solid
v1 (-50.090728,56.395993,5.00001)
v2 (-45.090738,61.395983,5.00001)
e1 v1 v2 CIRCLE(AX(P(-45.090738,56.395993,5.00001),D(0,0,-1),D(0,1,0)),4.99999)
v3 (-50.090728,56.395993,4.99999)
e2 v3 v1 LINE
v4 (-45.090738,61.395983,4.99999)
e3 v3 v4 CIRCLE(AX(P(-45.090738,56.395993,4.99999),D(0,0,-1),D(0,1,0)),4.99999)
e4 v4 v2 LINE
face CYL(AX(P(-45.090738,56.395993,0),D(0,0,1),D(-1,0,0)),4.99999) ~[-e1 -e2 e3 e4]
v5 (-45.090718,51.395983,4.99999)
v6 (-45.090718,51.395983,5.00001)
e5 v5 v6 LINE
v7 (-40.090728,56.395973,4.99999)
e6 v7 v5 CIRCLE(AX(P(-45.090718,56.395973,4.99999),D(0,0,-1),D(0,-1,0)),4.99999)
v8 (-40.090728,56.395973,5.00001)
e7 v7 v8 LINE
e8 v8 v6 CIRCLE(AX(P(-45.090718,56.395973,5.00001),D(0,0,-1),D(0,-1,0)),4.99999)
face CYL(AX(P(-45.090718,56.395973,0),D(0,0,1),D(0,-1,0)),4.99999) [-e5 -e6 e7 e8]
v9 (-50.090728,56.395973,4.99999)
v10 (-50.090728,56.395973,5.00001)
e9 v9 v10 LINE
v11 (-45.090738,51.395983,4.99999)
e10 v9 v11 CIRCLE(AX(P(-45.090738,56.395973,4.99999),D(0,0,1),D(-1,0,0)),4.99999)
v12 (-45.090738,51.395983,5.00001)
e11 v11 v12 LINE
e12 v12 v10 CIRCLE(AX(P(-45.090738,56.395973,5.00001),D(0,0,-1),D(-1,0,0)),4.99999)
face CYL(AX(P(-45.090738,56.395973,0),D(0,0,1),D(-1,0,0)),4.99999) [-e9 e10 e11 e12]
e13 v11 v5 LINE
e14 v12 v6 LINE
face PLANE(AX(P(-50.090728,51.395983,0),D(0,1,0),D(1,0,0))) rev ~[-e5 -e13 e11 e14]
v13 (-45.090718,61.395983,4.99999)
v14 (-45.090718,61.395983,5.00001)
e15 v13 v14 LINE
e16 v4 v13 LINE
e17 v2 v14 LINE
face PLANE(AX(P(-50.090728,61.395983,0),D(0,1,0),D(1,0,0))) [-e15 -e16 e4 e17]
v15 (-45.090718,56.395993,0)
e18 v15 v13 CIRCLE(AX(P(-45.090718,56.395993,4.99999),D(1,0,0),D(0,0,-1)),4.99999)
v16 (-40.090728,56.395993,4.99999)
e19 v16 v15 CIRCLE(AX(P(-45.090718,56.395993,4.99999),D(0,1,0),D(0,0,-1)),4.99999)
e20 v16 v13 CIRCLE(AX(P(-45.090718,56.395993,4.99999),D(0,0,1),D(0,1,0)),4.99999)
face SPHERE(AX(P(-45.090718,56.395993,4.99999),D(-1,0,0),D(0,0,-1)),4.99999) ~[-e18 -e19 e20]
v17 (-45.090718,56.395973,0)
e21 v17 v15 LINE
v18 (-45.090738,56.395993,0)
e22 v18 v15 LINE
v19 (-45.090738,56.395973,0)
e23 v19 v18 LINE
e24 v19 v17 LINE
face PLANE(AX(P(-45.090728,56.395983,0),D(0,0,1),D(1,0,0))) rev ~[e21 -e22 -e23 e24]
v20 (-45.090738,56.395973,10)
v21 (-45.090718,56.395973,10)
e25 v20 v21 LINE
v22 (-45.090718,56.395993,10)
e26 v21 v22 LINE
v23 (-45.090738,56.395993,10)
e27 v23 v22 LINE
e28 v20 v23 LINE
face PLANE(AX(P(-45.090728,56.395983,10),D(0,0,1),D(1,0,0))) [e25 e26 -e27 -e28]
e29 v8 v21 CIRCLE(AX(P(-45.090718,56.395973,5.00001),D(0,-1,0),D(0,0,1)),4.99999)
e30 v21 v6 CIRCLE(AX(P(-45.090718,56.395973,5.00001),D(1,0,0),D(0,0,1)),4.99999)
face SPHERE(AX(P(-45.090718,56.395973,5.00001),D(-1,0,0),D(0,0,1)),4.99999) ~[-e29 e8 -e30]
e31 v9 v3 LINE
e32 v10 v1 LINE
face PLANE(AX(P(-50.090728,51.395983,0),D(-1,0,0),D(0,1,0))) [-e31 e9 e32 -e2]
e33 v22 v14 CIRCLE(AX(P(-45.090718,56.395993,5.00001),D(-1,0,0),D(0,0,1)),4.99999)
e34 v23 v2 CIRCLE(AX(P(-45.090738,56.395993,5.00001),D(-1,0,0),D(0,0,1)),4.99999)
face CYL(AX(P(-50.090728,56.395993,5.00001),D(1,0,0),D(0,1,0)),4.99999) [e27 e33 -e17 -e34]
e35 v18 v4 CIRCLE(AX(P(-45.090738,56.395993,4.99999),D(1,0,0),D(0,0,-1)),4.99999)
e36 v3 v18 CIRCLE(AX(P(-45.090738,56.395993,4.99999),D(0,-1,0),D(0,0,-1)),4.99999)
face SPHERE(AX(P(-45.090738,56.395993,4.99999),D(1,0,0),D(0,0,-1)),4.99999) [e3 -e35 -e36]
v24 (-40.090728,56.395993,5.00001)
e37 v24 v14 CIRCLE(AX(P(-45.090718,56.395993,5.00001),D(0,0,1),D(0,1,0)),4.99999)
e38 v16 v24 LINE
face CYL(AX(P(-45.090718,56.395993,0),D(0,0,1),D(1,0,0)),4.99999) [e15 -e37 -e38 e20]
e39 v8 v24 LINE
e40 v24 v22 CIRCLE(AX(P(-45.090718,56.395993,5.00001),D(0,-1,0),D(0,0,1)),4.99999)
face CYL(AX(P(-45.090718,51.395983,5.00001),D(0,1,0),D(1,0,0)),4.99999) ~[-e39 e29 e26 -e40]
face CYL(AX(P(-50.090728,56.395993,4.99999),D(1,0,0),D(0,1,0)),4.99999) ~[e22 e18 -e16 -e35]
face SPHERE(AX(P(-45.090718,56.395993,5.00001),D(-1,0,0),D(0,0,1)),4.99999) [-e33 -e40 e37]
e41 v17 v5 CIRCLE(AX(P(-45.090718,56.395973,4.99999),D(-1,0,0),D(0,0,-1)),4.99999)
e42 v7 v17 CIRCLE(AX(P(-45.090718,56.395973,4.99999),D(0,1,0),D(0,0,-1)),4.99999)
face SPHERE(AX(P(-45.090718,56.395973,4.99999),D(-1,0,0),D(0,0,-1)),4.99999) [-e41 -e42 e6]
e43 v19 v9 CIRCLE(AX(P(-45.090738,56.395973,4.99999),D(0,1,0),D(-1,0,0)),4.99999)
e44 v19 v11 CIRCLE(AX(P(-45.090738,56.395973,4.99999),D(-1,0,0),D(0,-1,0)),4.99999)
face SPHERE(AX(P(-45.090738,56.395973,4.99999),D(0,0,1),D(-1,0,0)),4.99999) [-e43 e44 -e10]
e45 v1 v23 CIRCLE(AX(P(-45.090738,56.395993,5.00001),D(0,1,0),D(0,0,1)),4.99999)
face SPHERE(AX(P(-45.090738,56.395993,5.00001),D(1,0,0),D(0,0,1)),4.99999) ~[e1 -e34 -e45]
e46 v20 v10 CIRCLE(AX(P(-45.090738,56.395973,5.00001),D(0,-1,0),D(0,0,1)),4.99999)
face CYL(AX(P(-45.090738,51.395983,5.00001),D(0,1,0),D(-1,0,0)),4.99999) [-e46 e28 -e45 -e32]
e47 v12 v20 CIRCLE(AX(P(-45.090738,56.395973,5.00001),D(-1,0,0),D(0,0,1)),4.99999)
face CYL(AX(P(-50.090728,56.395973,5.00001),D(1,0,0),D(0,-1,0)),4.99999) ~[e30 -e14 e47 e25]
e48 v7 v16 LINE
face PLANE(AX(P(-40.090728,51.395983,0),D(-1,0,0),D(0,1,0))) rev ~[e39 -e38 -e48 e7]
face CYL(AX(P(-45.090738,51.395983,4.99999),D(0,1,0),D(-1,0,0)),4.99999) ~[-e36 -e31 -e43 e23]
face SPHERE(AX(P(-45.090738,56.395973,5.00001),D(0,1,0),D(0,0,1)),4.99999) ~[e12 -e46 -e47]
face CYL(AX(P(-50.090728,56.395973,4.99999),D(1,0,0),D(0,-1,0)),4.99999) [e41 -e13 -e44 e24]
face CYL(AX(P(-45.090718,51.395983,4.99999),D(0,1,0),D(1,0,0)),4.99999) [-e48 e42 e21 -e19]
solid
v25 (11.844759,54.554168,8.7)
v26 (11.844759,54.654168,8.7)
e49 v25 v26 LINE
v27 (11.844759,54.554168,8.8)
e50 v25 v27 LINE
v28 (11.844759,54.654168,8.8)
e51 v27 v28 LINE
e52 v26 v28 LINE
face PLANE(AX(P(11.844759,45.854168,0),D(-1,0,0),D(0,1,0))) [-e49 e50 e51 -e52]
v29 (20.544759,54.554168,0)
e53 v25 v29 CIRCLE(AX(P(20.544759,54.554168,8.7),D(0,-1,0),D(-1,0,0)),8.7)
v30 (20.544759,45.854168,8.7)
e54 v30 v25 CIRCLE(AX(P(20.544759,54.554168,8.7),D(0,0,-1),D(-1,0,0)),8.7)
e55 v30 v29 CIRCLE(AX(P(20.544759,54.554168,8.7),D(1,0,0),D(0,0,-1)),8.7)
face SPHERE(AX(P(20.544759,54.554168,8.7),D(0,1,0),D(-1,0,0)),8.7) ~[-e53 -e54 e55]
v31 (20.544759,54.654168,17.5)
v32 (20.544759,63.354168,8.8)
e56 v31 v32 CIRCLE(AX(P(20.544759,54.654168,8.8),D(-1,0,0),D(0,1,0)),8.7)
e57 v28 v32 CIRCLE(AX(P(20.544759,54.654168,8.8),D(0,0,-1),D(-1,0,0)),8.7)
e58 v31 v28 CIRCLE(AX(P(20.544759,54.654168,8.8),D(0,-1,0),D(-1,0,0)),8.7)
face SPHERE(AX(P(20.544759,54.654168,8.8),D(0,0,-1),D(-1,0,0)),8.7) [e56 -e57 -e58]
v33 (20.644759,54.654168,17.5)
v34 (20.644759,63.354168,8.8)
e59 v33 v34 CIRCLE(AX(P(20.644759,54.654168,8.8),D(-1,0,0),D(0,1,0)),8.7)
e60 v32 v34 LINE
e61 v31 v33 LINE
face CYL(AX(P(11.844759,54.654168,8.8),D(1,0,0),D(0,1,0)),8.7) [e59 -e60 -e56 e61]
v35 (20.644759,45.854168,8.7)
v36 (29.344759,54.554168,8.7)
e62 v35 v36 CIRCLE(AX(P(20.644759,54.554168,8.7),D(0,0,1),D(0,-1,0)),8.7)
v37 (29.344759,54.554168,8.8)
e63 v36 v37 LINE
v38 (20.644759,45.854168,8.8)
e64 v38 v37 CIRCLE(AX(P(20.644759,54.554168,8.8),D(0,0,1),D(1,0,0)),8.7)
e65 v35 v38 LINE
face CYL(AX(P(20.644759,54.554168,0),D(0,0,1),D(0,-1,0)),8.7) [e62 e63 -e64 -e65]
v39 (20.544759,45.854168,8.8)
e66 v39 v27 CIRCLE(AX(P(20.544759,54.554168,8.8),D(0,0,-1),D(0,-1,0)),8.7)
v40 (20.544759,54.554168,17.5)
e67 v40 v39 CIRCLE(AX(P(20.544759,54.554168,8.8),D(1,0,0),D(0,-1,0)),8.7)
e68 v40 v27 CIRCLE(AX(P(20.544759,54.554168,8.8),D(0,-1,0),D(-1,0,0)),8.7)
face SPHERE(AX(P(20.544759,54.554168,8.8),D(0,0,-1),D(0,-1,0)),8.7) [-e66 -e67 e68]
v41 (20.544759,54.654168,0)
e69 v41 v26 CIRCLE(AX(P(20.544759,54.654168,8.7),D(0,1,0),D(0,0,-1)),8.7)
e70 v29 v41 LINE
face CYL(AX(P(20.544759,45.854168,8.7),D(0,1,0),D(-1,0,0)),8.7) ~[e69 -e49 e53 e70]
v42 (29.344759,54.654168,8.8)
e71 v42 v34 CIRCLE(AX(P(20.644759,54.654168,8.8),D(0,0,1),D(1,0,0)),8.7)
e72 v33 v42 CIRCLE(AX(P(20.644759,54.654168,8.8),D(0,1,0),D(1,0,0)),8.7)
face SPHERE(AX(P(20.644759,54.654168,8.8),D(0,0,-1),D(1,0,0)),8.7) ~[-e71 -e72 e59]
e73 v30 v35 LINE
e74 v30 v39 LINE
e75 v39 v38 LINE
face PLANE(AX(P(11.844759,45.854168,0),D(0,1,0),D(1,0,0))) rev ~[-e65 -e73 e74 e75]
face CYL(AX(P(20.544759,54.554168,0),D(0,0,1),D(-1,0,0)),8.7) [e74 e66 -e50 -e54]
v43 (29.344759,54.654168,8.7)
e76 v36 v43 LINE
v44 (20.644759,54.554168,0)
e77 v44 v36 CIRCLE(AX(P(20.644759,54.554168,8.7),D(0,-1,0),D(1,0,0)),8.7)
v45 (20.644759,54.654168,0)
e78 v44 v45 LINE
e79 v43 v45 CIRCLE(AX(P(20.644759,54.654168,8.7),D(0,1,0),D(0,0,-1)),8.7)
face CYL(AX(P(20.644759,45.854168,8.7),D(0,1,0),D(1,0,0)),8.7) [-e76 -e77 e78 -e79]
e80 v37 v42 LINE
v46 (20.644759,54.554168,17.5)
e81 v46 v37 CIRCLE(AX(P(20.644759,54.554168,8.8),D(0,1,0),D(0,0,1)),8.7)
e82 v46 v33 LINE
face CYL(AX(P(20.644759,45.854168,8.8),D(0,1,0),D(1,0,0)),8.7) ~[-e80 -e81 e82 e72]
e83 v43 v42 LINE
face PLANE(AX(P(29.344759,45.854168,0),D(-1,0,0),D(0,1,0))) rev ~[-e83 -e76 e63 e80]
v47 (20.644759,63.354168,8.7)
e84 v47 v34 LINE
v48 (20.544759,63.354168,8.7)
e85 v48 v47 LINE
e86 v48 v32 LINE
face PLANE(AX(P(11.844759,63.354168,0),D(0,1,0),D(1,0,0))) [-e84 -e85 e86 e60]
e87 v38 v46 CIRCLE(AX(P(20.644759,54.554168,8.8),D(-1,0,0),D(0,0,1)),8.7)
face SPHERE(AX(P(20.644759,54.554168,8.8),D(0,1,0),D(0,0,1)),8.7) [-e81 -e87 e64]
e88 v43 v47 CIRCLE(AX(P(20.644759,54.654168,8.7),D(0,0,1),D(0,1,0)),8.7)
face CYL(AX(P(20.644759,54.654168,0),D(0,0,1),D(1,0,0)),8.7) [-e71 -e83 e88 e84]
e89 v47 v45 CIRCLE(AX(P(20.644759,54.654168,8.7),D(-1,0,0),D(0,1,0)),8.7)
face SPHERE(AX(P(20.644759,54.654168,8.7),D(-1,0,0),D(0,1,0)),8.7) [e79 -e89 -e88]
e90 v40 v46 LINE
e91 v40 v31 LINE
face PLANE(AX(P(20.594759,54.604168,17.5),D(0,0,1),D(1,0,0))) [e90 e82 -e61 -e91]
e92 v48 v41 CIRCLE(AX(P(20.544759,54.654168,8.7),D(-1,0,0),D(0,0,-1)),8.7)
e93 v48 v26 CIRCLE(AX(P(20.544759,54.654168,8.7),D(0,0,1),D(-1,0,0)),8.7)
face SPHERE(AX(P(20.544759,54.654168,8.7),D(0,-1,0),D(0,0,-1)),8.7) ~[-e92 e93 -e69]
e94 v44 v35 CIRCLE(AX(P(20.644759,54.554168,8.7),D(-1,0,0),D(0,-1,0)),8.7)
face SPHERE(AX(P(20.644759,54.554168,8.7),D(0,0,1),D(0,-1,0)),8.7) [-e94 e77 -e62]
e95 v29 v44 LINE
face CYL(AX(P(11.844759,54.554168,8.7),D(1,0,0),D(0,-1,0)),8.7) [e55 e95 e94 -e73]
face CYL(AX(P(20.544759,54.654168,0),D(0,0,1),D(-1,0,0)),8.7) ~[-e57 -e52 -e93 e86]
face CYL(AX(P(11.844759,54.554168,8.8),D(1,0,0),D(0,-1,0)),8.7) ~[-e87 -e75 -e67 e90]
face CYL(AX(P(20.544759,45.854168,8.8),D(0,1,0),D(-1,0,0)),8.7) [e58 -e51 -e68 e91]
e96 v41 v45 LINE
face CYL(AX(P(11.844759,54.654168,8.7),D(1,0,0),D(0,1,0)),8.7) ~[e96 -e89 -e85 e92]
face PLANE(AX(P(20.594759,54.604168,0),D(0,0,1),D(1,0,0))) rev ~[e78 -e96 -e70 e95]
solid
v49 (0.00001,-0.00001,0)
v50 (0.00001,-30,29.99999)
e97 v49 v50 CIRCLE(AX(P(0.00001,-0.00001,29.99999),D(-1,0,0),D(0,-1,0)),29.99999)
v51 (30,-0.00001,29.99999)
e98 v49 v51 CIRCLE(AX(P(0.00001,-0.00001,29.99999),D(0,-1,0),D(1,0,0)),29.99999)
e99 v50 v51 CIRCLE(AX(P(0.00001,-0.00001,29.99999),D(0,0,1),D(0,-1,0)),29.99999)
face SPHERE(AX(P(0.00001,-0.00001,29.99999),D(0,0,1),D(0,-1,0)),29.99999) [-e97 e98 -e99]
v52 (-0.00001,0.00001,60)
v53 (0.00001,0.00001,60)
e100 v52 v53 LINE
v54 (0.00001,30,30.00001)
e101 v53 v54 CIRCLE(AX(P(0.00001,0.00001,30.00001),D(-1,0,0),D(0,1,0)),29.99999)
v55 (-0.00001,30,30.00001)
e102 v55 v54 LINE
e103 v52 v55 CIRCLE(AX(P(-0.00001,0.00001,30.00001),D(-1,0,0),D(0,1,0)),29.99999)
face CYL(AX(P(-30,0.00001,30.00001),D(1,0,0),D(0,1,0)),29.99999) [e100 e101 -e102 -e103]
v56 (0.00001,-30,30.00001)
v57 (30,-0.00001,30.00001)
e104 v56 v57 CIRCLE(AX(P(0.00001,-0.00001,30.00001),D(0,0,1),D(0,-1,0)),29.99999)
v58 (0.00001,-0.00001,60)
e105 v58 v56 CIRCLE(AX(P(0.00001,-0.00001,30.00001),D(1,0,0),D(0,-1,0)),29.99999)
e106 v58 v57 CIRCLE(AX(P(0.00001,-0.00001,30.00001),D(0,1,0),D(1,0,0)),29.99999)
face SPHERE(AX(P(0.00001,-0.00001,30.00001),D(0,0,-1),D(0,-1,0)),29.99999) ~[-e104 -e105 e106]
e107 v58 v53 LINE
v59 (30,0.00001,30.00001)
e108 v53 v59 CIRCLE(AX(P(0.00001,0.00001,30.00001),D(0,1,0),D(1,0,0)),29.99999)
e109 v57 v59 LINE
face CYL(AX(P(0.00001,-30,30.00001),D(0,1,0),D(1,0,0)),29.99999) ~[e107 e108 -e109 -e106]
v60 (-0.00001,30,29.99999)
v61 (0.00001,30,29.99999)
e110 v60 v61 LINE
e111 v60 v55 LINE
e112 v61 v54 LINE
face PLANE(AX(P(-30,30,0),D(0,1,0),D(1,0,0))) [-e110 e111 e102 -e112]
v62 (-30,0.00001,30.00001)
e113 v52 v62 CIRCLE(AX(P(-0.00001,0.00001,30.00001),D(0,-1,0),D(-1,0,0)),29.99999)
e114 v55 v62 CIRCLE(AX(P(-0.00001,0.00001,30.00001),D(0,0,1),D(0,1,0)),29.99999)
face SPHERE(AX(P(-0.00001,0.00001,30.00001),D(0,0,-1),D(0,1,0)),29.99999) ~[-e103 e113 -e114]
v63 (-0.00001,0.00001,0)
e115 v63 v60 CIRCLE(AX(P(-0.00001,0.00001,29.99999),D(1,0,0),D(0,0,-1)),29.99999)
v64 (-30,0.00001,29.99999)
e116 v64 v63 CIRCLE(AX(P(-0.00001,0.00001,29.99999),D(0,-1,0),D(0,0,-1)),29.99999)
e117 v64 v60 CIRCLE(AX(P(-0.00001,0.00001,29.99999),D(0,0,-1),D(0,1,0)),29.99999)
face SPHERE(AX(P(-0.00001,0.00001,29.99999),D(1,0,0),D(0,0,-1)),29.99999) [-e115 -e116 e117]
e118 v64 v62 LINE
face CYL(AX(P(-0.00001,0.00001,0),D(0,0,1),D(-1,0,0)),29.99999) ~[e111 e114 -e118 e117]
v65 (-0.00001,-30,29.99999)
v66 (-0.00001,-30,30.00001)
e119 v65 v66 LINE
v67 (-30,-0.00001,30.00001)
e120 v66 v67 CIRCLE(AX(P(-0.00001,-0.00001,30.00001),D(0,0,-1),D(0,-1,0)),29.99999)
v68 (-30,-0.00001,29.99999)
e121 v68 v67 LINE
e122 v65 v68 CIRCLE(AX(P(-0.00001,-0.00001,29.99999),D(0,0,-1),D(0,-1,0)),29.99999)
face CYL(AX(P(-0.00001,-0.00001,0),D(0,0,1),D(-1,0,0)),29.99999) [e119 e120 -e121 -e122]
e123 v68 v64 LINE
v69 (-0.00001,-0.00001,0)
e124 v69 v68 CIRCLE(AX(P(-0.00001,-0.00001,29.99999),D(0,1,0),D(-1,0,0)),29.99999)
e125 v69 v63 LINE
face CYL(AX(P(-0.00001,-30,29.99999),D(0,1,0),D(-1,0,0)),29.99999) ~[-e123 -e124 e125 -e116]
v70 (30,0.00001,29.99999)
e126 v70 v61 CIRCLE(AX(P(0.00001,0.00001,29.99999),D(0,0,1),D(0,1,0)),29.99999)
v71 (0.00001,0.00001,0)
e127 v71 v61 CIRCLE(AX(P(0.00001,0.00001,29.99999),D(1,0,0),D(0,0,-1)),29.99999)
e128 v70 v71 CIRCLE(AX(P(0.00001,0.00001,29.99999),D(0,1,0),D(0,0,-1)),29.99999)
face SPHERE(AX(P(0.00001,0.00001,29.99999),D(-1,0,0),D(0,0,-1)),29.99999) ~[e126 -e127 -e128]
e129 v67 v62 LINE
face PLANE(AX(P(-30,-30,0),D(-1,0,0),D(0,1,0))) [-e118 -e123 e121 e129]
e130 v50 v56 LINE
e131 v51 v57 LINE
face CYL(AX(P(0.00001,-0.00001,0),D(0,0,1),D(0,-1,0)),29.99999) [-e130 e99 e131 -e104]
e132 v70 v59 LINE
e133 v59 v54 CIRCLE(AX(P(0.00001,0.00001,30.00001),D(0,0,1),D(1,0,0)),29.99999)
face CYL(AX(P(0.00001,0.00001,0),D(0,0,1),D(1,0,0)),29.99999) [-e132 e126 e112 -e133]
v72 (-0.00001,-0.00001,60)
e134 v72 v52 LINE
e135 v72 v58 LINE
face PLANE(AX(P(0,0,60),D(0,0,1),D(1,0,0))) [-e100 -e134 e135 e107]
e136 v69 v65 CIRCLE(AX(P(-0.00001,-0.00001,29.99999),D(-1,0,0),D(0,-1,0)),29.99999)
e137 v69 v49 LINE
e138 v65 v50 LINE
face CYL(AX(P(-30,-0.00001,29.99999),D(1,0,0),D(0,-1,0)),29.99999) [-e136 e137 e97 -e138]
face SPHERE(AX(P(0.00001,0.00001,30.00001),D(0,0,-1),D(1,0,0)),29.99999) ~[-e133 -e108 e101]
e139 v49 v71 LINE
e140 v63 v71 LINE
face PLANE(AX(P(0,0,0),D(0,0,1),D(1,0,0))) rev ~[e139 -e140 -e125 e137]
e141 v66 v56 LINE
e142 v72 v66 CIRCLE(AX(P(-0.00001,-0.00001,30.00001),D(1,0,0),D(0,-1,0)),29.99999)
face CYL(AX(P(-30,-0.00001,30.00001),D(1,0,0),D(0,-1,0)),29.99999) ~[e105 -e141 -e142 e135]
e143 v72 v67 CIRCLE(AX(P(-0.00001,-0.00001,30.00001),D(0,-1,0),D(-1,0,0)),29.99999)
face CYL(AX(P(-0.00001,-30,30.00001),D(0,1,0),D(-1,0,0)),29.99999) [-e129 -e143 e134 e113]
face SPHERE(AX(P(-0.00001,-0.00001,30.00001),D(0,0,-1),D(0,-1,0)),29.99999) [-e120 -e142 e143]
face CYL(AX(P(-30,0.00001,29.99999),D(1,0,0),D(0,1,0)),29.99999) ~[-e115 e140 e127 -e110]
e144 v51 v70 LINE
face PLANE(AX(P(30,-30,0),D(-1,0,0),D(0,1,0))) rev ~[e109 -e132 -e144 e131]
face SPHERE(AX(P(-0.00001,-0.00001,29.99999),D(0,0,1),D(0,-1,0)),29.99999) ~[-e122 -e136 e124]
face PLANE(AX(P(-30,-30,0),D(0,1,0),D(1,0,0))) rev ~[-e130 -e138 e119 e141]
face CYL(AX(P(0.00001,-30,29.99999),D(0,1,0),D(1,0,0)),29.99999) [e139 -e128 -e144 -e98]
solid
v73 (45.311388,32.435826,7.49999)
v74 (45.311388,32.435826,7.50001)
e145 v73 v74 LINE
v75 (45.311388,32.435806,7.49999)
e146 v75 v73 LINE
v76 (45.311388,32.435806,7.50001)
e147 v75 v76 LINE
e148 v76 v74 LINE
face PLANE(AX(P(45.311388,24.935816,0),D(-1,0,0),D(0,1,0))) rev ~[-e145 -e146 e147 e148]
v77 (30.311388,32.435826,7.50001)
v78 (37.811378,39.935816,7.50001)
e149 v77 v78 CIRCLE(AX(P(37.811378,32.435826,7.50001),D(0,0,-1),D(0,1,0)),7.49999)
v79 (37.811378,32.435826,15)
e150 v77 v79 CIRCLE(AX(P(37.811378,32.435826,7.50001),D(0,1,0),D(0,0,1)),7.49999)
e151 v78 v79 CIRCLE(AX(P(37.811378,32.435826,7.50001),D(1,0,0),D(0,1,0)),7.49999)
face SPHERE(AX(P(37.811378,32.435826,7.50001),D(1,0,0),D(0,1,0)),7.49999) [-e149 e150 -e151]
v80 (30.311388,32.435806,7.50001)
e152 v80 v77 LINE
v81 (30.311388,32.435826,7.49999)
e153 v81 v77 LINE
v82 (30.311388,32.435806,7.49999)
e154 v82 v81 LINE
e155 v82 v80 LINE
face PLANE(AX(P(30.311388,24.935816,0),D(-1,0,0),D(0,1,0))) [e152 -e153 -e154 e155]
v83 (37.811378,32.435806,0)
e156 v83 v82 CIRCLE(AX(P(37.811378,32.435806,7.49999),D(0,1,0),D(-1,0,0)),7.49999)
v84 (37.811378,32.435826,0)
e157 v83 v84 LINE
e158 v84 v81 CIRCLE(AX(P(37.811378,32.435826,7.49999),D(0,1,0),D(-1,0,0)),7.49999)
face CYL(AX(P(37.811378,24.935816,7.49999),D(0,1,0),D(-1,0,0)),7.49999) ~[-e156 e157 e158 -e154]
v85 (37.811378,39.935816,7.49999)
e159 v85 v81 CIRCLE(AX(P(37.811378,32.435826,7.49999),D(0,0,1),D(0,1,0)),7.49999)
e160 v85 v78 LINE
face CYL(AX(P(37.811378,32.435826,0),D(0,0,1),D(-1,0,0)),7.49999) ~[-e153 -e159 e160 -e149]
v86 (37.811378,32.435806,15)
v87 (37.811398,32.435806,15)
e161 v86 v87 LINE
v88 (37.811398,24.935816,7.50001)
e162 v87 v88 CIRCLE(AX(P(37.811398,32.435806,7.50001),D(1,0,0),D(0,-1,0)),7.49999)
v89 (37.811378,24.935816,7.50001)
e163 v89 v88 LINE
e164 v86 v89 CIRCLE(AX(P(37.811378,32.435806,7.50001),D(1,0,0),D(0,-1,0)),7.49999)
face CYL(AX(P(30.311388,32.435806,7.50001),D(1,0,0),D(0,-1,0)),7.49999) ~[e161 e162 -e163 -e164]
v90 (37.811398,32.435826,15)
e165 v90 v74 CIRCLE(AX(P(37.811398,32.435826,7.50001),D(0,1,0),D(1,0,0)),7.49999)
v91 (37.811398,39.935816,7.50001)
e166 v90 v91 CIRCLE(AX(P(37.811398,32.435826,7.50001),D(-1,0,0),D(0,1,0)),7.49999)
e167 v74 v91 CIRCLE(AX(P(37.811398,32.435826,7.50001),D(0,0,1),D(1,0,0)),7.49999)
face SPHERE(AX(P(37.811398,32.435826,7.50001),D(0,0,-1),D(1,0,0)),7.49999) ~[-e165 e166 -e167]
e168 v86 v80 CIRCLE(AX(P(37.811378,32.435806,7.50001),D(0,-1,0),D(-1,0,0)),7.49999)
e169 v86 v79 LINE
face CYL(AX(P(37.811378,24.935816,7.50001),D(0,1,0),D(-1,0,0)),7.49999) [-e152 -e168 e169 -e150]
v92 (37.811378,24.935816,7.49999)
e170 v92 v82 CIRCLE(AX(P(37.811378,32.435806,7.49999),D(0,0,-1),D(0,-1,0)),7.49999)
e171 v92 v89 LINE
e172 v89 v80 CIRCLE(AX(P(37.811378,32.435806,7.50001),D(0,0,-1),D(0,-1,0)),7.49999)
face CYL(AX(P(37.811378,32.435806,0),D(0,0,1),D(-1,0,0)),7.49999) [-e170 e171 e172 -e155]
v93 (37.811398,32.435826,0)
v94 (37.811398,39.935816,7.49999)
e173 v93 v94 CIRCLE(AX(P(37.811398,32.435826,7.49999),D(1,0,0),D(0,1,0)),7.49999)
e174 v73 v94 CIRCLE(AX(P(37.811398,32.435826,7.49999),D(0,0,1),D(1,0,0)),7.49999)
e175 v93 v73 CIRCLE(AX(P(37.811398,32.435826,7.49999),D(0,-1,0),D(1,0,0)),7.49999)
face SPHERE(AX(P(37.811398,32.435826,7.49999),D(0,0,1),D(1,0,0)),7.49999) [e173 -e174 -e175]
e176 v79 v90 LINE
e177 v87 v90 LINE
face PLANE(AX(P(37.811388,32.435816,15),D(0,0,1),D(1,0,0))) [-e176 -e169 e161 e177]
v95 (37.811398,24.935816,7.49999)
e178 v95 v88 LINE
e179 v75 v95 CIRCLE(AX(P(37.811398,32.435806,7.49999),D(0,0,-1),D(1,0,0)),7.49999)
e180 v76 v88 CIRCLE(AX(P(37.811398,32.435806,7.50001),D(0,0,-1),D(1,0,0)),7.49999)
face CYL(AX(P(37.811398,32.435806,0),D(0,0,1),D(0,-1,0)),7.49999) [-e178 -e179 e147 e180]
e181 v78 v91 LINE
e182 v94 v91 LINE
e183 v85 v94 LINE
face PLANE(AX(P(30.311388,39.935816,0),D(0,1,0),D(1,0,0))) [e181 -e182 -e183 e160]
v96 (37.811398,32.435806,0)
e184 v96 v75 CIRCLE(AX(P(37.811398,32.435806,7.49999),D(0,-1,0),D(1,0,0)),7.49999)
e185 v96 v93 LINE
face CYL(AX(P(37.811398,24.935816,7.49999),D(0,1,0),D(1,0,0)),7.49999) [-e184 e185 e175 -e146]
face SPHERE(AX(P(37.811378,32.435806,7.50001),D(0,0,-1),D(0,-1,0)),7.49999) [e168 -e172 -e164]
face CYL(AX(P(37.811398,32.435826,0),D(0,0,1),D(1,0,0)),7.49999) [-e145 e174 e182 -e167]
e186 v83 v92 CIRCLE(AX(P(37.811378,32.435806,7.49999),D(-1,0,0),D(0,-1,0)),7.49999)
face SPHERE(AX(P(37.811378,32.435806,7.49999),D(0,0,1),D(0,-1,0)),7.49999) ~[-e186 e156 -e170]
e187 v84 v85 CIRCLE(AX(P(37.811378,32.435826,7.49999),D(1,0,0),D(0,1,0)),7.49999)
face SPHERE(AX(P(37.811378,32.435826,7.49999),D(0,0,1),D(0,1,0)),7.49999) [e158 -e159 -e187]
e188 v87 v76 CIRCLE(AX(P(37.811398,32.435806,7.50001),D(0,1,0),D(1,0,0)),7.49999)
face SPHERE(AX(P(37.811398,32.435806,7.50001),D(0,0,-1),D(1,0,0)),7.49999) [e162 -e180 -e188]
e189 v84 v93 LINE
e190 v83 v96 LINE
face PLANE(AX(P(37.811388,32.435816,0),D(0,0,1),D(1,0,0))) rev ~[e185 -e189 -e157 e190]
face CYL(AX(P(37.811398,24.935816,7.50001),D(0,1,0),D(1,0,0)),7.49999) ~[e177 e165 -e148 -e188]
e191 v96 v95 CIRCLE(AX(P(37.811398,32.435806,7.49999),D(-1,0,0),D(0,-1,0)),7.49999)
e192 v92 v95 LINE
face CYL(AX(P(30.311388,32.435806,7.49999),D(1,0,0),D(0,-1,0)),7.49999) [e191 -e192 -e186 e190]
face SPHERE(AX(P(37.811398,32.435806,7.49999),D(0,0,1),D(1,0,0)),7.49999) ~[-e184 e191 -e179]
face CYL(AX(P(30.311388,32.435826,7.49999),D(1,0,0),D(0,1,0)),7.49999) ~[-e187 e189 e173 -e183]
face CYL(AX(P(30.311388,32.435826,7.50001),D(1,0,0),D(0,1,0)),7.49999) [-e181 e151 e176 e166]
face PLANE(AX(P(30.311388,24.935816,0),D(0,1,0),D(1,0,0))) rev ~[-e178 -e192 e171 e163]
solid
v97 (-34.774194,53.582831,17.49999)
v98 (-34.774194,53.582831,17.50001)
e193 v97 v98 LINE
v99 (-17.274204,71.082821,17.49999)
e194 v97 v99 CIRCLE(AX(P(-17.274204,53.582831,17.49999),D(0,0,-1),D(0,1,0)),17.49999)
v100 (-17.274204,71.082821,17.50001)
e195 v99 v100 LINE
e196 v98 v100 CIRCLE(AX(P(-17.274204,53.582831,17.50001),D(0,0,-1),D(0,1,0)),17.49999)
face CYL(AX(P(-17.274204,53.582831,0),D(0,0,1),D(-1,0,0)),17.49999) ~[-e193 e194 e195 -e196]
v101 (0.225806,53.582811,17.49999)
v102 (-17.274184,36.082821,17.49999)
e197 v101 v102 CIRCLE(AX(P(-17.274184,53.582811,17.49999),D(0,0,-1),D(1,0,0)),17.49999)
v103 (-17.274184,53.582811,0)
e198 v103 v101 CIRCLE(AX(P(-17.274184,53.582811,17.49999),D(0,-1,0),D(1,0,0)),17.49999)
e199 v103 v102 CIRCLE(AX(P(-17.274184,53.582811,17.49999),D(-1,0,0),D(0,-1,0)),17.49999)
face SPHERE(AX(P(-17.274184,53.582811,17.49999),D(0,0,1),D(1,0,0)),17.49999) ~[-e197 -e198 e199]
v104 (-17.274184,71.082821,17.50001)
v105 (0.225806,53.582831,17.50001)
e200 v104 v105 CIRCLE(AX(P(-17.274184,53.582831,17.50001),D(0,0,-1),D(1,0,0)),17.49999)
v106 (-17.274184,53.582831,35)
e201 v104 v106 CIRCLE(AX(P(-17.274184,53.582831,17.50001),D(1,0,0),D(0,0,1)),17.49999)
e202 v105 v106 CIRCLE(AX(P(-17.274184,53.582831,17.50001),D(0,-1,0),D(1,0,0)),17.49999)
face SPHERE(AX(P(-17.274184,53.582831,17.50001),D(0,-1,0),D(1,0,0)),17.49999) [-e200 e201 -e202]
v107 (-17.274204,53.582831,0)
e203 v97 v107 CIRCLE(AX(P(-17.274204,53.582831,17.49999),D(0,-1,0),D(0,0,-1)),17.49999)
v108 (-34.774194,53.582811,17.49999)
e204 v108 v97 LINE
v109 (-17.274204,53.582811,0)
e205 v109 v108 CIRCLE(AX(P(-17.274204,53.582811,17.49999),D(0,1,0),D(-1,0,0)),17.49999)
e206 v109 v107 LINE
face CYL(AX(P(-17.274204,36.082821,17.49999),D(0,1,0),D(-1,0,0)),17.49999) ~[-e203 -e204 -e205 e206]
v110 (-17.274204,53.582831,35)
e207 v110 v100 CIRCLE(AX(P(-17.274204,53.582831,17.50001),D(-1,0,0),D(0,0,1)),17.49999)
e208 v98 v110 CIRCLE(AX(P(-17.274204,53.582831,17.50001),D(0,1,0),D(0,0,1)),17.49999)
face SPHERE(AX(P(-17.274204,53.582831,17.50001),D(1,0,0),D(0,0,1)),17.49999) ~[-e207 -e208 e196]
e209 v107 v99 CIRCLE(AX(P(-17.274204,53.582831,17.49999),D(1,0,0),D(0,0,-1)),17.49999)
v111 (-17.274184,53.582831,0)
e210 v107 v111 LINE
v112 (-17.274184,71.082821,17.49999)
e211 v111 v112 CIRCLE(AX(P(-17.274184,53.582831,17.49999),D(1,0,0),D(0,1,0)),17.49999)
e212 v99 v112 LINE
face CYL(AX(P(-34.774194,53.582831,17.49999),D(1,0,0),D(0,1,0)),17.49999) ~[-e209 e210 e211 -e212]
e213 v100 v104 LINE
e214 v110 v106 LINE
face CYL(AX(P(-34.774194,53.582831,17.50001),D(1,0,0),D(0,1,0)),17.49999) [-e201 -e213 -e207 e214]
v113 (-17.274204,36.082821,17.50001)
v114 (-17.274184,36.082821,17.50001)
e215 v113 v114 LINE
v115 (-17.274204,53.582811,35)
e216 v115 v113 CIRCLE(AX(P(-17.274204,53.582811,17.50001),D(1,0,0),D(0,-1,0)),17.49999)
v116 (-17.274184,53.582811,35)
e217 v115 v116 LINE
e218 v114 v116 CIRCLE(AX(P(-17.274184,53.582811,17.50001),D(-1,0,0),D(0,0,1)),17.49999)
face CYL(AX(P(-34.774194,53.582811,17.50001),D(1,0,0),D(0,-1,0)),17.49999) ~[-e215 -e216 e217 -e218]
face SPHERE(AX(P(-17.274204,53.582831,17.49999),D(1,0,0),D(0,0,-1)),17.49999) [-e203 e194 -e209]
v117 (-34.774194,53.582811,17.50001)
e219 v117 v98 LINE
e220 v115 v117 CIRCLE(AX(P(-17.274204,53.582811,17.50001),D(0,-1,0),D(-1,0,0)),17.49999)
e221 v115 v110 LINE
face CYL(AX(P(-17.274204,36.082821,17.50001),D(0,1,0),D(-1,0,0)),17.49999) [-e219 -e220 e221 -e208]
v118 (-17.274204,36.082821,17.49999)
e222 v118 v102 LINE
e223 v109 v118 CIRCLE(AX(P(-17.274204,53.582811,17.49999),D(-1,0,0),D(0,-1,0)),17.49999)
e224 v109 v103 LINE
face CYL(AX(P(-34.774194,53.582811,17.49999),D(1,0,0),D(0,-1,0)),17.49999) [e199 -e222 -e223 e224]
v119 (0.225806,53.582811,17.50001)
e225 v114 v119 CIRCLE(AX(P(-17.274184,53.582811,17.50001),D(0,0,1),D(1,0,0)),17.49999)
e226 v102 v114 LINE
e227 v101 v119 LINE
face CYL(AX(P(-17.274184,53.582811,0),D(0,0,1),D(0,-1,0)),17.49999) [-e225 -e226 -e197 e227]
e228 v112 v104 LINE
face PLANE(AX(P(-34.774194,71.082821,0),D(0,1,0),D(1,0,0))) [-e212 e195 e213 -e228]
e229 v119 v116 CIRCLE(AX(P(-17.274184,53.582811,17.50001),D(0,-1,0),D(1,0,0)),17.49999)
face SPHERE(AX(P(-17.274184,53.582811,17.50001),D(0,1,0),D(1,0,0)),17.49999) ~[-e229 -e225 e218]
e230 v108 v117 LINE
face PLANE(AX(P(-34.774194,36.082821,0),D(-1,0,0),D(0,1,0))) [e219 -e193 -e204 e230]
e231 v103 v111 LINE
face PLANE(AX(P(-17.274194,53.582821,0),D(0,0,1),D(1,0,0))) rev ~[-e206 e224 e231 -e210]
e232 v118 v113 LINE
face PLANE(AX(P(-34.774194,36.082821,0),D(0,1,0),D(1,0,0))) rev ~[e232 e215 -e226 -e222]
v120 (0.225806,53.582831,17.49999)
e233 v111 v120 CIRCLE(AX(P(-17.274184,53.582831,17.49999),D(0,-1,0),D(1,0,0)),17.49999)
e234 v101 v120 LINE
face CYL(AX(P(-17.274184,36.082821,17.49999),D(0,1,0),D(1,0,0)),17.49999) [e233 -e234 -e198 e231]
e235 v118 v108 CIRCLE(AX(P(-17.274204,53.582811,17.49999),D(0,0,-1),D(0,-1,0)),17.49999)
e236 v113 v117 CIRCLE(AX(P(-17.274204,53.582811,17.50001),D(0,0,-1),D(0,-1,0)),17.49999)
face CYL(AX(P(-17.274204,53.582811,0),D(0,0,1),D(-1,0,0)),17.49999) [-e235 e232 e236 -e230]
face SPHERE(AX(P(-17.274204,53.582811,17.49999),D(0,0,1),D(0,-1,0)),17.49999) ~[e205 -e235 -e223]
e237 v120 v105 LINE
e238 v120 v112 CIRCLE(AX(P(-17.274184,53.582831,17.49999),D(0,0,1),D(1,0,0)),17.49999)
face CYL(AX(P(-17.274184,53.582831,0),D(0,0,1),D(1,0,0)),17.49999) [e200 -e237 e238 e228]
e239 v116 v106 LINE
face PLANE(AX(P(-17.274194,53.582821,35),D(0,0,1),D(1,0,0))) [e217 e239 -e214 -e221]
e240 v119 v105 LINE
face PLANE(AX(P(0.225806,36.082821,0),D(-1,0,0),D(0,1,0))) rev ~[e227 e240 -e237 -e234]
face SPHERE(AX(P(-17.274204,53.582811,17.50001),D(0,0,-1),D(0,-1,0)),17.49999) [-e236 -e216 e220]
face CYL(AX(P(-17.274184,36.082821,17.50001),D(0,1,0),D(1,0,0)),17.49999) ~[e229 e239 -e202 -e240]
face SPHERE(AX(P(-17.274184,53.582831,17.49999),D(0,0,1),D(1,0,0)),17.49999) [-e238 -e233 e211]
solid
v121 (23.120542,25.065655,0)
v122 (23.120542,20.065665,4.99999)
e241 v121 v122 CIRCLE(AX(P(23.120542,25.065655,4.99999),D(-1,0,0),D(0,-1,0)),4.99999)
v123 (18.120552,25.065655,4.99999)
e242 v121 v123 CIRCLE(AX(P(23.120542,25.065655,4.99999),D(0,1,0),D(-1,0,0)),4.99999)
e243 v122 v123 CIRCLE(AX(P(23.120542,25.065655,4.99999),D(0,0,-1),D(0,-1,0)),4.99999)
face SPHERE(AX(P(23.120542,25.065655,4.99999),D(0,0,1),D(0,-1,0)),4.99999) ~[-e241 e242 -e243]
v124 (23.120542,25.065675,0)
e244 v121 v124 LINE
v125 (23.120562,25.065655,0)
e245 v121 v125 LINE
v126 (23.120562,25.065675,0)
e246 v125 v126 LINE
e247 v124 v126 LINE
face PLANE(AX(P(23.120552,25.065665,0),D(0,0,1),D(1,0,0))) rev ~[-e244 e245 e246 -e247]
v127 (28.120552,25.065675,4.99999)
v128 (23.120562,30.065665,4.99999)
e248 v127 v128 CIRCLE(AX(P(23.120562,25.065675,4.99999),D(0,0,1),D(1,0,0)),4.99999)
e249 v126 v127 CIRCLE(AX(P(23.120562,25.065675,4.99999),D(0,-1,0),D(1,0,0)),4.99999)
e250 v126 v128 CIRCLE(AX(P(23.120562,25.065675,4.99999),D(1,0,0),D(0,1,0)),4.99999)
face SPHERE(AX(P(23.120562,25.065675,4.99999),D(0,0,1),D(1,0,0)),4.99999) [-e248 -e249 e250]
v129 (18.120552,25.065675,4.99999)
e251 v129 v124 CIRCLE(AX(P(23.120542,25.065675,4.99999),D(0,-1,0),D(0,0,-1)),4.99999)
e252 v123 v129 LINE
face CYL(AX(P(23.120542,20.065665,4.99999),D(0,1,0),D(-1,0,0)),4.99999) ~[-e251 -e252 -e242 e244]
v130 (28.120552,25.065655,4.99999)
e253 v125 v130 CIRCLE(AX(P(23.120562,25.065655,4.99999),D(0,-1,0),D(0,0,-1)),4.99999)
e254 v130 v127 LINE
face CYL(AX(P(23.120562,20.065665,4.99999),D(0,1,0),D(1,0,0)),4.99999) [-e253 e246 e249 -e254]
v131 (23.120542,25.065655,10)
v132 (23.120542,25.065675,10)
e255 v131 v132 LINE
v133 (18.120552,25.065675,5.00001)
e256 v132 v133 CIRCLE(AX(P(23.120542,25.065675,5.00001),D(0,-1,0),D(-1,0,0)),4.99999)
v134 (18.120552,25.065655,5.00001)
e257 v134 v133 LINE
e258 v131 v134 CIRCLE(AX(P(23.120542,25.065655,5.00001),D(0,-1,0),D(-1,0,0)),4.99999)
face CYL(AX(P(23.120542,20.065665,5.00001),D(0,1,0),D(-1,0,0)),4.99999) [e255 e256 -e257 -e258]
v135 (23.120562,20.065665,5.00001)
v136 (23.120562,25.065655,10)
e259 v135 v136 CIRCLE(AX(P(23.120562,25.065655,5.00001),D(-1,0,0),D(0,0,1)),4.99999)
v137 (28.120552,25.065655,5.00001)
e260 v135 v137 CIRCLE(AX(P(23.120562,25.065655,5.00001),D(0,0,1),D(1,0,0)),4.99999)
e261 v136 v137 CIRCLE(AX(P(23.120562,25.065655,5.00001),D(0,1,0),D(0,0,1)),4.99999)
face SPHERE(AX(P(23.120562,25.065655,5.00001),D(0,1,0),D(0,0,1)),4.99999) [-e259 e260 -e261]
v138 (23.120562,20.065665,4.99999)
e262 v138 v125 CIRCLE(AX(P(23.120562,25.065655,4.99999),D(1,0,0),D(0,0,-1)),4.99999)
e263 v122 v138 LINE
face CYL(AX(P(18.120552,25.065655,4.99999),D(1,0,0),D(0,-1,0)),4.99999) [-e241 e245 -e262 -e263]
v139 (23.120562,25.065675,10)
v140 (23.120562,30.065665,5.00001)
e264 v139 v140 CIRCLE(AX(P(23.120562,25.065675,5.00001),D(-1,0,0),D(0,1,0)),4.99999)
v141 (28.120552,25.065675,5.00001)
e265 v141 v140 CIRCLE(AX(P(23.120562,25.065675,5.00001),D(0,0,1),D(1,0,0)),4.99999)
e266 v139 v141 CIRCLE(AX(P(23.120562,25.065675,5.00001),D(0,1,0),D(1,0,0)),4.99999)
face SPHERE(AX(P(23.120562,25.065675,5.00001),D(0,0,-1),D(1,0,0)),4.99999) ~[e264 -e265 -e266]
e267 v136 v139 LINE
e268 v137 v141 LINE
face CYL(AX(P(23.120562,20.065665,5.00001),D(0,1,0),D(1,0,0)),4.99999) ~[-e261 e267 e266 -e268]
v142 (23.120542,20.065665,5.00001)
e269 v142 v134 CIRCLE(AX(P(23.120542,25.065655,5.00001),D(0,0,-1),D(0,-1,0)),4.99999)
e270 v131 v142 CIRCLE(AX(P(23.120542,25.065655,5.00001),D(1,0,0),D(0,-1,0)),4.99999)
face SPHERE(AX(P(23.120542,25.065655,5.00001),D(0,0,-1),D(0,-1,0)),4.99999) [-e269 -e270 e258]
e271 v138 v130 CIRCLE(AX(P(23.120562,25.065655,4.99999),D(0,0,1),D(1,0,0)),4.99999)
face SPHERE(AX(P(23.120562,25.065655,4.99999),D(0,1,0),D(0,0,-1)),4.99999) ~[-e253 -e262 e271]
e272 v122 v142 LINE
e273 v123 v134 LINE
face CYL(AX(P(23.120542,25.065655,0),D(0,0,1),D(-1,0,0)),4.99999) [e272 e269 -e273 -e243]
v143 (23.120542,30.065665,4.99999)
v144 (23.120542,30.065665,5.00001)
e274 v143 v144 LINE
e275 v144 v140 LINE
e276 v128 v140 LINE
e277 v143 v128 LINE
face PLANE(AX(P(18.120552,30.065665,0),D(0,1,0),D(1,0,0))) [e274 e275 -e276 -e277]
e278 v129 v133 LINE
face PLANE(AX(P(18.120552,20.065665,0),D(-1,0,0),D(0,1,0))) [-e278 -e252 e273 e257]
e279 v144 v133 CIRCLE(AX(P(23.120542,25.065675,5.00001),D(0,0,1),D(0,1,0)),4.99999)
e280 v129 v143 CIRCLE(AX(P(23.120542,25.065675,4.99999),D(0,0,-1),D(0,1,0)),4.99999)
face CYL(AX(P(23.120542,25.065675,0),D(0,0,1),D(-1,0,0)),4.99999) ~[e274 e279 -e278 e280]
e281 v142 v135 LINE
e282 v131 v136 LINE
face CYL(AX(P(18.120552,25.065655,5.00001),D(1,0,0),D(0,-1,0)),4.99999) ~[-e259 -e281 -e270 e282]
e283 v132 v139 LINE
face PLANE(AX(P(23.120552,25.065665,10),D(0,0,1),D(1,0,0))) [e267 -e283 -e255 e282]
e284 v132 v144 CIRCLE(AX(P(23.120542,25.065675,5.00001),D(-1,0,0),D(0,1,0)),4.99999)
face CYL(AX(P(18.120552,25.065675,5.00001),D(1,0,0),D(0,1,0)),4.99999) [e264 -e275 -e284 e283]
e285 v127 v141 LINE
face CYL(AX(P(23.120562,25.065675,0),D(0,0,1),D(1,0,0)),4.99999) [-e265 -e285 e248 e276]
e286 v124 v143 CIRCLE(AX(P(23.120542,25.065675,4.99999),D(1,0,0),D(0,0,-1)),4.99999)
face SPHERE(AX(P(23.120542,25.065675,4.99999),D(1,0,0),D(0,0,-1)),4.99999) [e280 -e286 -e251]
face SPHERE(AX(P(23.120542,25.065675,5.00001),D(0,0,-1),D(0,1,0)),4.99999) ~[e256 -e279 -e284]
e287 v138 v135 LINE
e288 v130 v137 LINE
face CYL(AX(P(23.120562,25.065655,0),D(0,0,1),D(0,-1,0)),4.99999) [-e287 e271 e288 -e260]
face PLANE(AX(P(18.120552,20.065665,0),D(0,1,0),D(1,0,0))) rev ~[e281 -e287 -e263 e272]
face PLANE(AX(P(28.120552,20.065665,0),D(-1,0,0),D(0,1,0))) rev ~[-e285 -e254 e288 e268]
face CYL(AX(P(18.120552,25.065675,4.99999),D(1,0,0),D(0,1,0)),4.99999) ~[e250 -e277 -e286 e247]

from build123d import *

# Parameters (mm, degrees)
F0_W      = 60
F0_H      = 60
F1_DEPTH  = 60
F2_R      = 29.99999
F3_W      = 10
F3_H      = 10
F4_DEPTH  = 10
F5_R      = 4.99999
F6_W      = 15
F6_H      = 15
F7_DEPTH  = 15
F8_R      = 7.49999
F9_W      = 17.5
F9_H      = 17.5
F10_DEPTH = 17.5
F11_R     = 8.7
F12_W     = 35
F12_H     = 35
F13_DEPTH = 35
F14_R     = 17.49999
F15_W     = 10
F15_H     = 10
F16_DEPTH = 10
F17_R     = 4.99999


# Not quite as in the source:
# - a fillet or chamfer is up to 0.001 mm smaller than in the source, because OpenCascade refuses the exact size


with BuildPart() as f1:
    # F0 (on Top) → F1 (new body)
    with BuildSketch(Plane.XY):
        Rectangle(F0_W, F0_H)
    extrude(amount=F1_DEPTH)

    # F2 (radius 30 in the source; OpenCascade refuses exactly that, so slightly less here)
    f2_edges = [f1.edges().sort_by_distance(p)[0] for p in [
        (30, -30, 30),
        (-30, -30, 30),
        (0, -30, 0),
        (0, -30, 60),
        (0, 30, 0),
        (-30, 0, 0),
        (30, 0, 0),
        (30, 30, 30),
        (30, 0, 60),
        (-30, 30, 30),
        (0, 30, 60),
        (-30, 0, 60),
    ]]
    fillet(f2_edges, radius=F2_R)


with BuildPart() as f4:
    # F3 (on Top) → F4 (new body)
    with BuildSketch(Plane.XY):
        with Locations((23.1205523014, 25.0656651421)):
            Rectangle(F3_W, F3_H)
    extrude(amount=F4_DEPTH)

    # F5 (radius 5 in the source; OpenCascade refuses exactly that, so slightly less here)
    f5_edges = [f4.edges().sort_by_distance(p)[0] for p in [
        (28.120552, 30.065665, 5),
        (18.120552, 20.065665, 5),
        (28.120552, 25.065665, 0),
        (28.120552, 25.065665, 10),
        (23.120552, 20.065665, 10),
        (23.120552, 20.065665, 0),
        (28.120552, 20.065665, 5),
        (23.120552, 30.065665, 0),
        (18.120552, 25.065665, 0),
        (18.120552, 30.065665, 5),
        (23.120552, 30.065665, 10),
        (18.120552, 25.065665, 10),
    ]]
    fillet(f5_edges, radius=F5_R)


with BuildPart() as f7:
    # F6 (on Top) → F7 (new body)
    with BuildSketch(Plane.XY):
        with Locations((37.8113878518, 32.4358163551)):
            Rectangle(F6_W, F6_H)
    extrude(amount=F7_DEPTH)

    # F8 (radius 7.5 in the source; OpenCascade refuses exactly that, so slightly less here)
    f8_edges = [f7.edges().sort_by_distance(p)[0] for p in [
        (45.311388, 24.935816, 7.5),
        (45.311388, 39.935816, 7.5),
        (45.311388, 32.435816, 0),
        (45.311388, 32.435816, 15),
        (37.811388, 39.935816, 15),
        (30.311388, 39.935816, 7.5),
        (37.811388, 39.935816, 0),
        (30.311388, 24.935816, 7.5),
        (37.811388, 24.935816, 15),
        (37.811388, 24.935816, 0),
        (30.311388, 32.435816, 0),
        (30.311388, 32.435816, 15),
    ]]
    fillet(f8_edges, radius=F8_R)


with BuildPart() as f10:
    # F9 (on Top) → F10 (new body)
    with BuildSketch(Plane.XY):
        with Locations((20.5947593786, 54.6041680584)):
            Rectangle(F9_W, F9_H)
    extrude(amount=F10_DEPTH)

    # F11
    f11_edges = [f10.edges().sort_by_distance(p)[0] for p in [
        (11.844759, 54.604168, 0),
        (20.594759, 63.354168, 0),
        (11.844759, 45.854168, 8.75),
        (29.344759, 63.354168, 8.75),
        (29.344759, 54.604168, 17.5),
        (20.594759, 45.854168, 17.5),
        (11.844759, 63.354168, 8.75),
        (11.844759, 54.604168, 17.5),
        (29.344759, 45.854168, 8.75),
        (20.594759, 45.854168, 0),
        (20.594759, 63.354168, 17.5),
        (29.344759, 54.604168, 0),
    ]]
    fillet(f11_edges, radius=F11_R)


with BuildPart() as f13:
    # F12 (on Top) → F13 (new body)
    with BuildSketch(Plane.XY):
        with Locations((-17.2741941642, 53.5828206353)):
            Rectangle(F12_W, F12_H)
    extrude(amount=F13_DEPTH)

    # F14 (radius 17.5 in the source; OpenCascade refuses exactly that, so slightly less here)
    f14_edges = [f13.edges().sort_by_distance(p)[0] for p in [
        (0.225806, 53.582821, 35),
        (0.225806, 36.082821, 17.5),
        (0.225806, 71.082821, 17.5),
        (0.225806, 53.582821, 0),
        (-17.274194, 71.082821, 35),
        (-34.774194, 36.082821, 17.5),
        (-17.274194, 36.082821, 0),
        (-17.274194, 36.082821, 35),
        (-34.774194, 53.582821, 35),
        (-17.274194, 71.082821, 0),
        (-34.774194, 53.582821, 0),
        (-34.774194, 71.082821, 17.5),
    ]]
    fillet(f14_edges, radius=F14_R)


with BuildPart() as f16:
    # F15 (on Top) → F16 (new body)
    with BuildSketch(Plane.XY):
        with Locations((-45.0907275081, 56.3959827726)):
            Rectangle(F15_W, F15_H)
    extrude(amount=F16_DEPTH)

    # F17 (radius 5 in the source; OpenCascade refuses exactly that, so slightly less here)
    f17_edges = [f16.edges().sort_by_distance(p)[0] for p in [
        (-45.090728, 61.395983, 10),
        (-50.090728, 56.395983, 10),
        (-45.090728, 51.395983, 10),
        (-40.090728, 56.395983, 10),
        (-50.090728, 51.395983, 5),
        (-45.090728, 61.395983, 0),
        (-50.090728, 56.395983, 0),
        (-45.090728, 51.395983, 0),
        (-40.090728, 56.395983, 0),
        (-40.090728, 61.395983, 5),
        (-50.090728, 61.395983, 5),
        (-40.090728, 51.395983, 5),
    ]]
    fillet(f17_edges, radius=F17_R)


solid = Compound([f1.part, f4.part, f7.part, f10.part, f13.part, f16.part])
